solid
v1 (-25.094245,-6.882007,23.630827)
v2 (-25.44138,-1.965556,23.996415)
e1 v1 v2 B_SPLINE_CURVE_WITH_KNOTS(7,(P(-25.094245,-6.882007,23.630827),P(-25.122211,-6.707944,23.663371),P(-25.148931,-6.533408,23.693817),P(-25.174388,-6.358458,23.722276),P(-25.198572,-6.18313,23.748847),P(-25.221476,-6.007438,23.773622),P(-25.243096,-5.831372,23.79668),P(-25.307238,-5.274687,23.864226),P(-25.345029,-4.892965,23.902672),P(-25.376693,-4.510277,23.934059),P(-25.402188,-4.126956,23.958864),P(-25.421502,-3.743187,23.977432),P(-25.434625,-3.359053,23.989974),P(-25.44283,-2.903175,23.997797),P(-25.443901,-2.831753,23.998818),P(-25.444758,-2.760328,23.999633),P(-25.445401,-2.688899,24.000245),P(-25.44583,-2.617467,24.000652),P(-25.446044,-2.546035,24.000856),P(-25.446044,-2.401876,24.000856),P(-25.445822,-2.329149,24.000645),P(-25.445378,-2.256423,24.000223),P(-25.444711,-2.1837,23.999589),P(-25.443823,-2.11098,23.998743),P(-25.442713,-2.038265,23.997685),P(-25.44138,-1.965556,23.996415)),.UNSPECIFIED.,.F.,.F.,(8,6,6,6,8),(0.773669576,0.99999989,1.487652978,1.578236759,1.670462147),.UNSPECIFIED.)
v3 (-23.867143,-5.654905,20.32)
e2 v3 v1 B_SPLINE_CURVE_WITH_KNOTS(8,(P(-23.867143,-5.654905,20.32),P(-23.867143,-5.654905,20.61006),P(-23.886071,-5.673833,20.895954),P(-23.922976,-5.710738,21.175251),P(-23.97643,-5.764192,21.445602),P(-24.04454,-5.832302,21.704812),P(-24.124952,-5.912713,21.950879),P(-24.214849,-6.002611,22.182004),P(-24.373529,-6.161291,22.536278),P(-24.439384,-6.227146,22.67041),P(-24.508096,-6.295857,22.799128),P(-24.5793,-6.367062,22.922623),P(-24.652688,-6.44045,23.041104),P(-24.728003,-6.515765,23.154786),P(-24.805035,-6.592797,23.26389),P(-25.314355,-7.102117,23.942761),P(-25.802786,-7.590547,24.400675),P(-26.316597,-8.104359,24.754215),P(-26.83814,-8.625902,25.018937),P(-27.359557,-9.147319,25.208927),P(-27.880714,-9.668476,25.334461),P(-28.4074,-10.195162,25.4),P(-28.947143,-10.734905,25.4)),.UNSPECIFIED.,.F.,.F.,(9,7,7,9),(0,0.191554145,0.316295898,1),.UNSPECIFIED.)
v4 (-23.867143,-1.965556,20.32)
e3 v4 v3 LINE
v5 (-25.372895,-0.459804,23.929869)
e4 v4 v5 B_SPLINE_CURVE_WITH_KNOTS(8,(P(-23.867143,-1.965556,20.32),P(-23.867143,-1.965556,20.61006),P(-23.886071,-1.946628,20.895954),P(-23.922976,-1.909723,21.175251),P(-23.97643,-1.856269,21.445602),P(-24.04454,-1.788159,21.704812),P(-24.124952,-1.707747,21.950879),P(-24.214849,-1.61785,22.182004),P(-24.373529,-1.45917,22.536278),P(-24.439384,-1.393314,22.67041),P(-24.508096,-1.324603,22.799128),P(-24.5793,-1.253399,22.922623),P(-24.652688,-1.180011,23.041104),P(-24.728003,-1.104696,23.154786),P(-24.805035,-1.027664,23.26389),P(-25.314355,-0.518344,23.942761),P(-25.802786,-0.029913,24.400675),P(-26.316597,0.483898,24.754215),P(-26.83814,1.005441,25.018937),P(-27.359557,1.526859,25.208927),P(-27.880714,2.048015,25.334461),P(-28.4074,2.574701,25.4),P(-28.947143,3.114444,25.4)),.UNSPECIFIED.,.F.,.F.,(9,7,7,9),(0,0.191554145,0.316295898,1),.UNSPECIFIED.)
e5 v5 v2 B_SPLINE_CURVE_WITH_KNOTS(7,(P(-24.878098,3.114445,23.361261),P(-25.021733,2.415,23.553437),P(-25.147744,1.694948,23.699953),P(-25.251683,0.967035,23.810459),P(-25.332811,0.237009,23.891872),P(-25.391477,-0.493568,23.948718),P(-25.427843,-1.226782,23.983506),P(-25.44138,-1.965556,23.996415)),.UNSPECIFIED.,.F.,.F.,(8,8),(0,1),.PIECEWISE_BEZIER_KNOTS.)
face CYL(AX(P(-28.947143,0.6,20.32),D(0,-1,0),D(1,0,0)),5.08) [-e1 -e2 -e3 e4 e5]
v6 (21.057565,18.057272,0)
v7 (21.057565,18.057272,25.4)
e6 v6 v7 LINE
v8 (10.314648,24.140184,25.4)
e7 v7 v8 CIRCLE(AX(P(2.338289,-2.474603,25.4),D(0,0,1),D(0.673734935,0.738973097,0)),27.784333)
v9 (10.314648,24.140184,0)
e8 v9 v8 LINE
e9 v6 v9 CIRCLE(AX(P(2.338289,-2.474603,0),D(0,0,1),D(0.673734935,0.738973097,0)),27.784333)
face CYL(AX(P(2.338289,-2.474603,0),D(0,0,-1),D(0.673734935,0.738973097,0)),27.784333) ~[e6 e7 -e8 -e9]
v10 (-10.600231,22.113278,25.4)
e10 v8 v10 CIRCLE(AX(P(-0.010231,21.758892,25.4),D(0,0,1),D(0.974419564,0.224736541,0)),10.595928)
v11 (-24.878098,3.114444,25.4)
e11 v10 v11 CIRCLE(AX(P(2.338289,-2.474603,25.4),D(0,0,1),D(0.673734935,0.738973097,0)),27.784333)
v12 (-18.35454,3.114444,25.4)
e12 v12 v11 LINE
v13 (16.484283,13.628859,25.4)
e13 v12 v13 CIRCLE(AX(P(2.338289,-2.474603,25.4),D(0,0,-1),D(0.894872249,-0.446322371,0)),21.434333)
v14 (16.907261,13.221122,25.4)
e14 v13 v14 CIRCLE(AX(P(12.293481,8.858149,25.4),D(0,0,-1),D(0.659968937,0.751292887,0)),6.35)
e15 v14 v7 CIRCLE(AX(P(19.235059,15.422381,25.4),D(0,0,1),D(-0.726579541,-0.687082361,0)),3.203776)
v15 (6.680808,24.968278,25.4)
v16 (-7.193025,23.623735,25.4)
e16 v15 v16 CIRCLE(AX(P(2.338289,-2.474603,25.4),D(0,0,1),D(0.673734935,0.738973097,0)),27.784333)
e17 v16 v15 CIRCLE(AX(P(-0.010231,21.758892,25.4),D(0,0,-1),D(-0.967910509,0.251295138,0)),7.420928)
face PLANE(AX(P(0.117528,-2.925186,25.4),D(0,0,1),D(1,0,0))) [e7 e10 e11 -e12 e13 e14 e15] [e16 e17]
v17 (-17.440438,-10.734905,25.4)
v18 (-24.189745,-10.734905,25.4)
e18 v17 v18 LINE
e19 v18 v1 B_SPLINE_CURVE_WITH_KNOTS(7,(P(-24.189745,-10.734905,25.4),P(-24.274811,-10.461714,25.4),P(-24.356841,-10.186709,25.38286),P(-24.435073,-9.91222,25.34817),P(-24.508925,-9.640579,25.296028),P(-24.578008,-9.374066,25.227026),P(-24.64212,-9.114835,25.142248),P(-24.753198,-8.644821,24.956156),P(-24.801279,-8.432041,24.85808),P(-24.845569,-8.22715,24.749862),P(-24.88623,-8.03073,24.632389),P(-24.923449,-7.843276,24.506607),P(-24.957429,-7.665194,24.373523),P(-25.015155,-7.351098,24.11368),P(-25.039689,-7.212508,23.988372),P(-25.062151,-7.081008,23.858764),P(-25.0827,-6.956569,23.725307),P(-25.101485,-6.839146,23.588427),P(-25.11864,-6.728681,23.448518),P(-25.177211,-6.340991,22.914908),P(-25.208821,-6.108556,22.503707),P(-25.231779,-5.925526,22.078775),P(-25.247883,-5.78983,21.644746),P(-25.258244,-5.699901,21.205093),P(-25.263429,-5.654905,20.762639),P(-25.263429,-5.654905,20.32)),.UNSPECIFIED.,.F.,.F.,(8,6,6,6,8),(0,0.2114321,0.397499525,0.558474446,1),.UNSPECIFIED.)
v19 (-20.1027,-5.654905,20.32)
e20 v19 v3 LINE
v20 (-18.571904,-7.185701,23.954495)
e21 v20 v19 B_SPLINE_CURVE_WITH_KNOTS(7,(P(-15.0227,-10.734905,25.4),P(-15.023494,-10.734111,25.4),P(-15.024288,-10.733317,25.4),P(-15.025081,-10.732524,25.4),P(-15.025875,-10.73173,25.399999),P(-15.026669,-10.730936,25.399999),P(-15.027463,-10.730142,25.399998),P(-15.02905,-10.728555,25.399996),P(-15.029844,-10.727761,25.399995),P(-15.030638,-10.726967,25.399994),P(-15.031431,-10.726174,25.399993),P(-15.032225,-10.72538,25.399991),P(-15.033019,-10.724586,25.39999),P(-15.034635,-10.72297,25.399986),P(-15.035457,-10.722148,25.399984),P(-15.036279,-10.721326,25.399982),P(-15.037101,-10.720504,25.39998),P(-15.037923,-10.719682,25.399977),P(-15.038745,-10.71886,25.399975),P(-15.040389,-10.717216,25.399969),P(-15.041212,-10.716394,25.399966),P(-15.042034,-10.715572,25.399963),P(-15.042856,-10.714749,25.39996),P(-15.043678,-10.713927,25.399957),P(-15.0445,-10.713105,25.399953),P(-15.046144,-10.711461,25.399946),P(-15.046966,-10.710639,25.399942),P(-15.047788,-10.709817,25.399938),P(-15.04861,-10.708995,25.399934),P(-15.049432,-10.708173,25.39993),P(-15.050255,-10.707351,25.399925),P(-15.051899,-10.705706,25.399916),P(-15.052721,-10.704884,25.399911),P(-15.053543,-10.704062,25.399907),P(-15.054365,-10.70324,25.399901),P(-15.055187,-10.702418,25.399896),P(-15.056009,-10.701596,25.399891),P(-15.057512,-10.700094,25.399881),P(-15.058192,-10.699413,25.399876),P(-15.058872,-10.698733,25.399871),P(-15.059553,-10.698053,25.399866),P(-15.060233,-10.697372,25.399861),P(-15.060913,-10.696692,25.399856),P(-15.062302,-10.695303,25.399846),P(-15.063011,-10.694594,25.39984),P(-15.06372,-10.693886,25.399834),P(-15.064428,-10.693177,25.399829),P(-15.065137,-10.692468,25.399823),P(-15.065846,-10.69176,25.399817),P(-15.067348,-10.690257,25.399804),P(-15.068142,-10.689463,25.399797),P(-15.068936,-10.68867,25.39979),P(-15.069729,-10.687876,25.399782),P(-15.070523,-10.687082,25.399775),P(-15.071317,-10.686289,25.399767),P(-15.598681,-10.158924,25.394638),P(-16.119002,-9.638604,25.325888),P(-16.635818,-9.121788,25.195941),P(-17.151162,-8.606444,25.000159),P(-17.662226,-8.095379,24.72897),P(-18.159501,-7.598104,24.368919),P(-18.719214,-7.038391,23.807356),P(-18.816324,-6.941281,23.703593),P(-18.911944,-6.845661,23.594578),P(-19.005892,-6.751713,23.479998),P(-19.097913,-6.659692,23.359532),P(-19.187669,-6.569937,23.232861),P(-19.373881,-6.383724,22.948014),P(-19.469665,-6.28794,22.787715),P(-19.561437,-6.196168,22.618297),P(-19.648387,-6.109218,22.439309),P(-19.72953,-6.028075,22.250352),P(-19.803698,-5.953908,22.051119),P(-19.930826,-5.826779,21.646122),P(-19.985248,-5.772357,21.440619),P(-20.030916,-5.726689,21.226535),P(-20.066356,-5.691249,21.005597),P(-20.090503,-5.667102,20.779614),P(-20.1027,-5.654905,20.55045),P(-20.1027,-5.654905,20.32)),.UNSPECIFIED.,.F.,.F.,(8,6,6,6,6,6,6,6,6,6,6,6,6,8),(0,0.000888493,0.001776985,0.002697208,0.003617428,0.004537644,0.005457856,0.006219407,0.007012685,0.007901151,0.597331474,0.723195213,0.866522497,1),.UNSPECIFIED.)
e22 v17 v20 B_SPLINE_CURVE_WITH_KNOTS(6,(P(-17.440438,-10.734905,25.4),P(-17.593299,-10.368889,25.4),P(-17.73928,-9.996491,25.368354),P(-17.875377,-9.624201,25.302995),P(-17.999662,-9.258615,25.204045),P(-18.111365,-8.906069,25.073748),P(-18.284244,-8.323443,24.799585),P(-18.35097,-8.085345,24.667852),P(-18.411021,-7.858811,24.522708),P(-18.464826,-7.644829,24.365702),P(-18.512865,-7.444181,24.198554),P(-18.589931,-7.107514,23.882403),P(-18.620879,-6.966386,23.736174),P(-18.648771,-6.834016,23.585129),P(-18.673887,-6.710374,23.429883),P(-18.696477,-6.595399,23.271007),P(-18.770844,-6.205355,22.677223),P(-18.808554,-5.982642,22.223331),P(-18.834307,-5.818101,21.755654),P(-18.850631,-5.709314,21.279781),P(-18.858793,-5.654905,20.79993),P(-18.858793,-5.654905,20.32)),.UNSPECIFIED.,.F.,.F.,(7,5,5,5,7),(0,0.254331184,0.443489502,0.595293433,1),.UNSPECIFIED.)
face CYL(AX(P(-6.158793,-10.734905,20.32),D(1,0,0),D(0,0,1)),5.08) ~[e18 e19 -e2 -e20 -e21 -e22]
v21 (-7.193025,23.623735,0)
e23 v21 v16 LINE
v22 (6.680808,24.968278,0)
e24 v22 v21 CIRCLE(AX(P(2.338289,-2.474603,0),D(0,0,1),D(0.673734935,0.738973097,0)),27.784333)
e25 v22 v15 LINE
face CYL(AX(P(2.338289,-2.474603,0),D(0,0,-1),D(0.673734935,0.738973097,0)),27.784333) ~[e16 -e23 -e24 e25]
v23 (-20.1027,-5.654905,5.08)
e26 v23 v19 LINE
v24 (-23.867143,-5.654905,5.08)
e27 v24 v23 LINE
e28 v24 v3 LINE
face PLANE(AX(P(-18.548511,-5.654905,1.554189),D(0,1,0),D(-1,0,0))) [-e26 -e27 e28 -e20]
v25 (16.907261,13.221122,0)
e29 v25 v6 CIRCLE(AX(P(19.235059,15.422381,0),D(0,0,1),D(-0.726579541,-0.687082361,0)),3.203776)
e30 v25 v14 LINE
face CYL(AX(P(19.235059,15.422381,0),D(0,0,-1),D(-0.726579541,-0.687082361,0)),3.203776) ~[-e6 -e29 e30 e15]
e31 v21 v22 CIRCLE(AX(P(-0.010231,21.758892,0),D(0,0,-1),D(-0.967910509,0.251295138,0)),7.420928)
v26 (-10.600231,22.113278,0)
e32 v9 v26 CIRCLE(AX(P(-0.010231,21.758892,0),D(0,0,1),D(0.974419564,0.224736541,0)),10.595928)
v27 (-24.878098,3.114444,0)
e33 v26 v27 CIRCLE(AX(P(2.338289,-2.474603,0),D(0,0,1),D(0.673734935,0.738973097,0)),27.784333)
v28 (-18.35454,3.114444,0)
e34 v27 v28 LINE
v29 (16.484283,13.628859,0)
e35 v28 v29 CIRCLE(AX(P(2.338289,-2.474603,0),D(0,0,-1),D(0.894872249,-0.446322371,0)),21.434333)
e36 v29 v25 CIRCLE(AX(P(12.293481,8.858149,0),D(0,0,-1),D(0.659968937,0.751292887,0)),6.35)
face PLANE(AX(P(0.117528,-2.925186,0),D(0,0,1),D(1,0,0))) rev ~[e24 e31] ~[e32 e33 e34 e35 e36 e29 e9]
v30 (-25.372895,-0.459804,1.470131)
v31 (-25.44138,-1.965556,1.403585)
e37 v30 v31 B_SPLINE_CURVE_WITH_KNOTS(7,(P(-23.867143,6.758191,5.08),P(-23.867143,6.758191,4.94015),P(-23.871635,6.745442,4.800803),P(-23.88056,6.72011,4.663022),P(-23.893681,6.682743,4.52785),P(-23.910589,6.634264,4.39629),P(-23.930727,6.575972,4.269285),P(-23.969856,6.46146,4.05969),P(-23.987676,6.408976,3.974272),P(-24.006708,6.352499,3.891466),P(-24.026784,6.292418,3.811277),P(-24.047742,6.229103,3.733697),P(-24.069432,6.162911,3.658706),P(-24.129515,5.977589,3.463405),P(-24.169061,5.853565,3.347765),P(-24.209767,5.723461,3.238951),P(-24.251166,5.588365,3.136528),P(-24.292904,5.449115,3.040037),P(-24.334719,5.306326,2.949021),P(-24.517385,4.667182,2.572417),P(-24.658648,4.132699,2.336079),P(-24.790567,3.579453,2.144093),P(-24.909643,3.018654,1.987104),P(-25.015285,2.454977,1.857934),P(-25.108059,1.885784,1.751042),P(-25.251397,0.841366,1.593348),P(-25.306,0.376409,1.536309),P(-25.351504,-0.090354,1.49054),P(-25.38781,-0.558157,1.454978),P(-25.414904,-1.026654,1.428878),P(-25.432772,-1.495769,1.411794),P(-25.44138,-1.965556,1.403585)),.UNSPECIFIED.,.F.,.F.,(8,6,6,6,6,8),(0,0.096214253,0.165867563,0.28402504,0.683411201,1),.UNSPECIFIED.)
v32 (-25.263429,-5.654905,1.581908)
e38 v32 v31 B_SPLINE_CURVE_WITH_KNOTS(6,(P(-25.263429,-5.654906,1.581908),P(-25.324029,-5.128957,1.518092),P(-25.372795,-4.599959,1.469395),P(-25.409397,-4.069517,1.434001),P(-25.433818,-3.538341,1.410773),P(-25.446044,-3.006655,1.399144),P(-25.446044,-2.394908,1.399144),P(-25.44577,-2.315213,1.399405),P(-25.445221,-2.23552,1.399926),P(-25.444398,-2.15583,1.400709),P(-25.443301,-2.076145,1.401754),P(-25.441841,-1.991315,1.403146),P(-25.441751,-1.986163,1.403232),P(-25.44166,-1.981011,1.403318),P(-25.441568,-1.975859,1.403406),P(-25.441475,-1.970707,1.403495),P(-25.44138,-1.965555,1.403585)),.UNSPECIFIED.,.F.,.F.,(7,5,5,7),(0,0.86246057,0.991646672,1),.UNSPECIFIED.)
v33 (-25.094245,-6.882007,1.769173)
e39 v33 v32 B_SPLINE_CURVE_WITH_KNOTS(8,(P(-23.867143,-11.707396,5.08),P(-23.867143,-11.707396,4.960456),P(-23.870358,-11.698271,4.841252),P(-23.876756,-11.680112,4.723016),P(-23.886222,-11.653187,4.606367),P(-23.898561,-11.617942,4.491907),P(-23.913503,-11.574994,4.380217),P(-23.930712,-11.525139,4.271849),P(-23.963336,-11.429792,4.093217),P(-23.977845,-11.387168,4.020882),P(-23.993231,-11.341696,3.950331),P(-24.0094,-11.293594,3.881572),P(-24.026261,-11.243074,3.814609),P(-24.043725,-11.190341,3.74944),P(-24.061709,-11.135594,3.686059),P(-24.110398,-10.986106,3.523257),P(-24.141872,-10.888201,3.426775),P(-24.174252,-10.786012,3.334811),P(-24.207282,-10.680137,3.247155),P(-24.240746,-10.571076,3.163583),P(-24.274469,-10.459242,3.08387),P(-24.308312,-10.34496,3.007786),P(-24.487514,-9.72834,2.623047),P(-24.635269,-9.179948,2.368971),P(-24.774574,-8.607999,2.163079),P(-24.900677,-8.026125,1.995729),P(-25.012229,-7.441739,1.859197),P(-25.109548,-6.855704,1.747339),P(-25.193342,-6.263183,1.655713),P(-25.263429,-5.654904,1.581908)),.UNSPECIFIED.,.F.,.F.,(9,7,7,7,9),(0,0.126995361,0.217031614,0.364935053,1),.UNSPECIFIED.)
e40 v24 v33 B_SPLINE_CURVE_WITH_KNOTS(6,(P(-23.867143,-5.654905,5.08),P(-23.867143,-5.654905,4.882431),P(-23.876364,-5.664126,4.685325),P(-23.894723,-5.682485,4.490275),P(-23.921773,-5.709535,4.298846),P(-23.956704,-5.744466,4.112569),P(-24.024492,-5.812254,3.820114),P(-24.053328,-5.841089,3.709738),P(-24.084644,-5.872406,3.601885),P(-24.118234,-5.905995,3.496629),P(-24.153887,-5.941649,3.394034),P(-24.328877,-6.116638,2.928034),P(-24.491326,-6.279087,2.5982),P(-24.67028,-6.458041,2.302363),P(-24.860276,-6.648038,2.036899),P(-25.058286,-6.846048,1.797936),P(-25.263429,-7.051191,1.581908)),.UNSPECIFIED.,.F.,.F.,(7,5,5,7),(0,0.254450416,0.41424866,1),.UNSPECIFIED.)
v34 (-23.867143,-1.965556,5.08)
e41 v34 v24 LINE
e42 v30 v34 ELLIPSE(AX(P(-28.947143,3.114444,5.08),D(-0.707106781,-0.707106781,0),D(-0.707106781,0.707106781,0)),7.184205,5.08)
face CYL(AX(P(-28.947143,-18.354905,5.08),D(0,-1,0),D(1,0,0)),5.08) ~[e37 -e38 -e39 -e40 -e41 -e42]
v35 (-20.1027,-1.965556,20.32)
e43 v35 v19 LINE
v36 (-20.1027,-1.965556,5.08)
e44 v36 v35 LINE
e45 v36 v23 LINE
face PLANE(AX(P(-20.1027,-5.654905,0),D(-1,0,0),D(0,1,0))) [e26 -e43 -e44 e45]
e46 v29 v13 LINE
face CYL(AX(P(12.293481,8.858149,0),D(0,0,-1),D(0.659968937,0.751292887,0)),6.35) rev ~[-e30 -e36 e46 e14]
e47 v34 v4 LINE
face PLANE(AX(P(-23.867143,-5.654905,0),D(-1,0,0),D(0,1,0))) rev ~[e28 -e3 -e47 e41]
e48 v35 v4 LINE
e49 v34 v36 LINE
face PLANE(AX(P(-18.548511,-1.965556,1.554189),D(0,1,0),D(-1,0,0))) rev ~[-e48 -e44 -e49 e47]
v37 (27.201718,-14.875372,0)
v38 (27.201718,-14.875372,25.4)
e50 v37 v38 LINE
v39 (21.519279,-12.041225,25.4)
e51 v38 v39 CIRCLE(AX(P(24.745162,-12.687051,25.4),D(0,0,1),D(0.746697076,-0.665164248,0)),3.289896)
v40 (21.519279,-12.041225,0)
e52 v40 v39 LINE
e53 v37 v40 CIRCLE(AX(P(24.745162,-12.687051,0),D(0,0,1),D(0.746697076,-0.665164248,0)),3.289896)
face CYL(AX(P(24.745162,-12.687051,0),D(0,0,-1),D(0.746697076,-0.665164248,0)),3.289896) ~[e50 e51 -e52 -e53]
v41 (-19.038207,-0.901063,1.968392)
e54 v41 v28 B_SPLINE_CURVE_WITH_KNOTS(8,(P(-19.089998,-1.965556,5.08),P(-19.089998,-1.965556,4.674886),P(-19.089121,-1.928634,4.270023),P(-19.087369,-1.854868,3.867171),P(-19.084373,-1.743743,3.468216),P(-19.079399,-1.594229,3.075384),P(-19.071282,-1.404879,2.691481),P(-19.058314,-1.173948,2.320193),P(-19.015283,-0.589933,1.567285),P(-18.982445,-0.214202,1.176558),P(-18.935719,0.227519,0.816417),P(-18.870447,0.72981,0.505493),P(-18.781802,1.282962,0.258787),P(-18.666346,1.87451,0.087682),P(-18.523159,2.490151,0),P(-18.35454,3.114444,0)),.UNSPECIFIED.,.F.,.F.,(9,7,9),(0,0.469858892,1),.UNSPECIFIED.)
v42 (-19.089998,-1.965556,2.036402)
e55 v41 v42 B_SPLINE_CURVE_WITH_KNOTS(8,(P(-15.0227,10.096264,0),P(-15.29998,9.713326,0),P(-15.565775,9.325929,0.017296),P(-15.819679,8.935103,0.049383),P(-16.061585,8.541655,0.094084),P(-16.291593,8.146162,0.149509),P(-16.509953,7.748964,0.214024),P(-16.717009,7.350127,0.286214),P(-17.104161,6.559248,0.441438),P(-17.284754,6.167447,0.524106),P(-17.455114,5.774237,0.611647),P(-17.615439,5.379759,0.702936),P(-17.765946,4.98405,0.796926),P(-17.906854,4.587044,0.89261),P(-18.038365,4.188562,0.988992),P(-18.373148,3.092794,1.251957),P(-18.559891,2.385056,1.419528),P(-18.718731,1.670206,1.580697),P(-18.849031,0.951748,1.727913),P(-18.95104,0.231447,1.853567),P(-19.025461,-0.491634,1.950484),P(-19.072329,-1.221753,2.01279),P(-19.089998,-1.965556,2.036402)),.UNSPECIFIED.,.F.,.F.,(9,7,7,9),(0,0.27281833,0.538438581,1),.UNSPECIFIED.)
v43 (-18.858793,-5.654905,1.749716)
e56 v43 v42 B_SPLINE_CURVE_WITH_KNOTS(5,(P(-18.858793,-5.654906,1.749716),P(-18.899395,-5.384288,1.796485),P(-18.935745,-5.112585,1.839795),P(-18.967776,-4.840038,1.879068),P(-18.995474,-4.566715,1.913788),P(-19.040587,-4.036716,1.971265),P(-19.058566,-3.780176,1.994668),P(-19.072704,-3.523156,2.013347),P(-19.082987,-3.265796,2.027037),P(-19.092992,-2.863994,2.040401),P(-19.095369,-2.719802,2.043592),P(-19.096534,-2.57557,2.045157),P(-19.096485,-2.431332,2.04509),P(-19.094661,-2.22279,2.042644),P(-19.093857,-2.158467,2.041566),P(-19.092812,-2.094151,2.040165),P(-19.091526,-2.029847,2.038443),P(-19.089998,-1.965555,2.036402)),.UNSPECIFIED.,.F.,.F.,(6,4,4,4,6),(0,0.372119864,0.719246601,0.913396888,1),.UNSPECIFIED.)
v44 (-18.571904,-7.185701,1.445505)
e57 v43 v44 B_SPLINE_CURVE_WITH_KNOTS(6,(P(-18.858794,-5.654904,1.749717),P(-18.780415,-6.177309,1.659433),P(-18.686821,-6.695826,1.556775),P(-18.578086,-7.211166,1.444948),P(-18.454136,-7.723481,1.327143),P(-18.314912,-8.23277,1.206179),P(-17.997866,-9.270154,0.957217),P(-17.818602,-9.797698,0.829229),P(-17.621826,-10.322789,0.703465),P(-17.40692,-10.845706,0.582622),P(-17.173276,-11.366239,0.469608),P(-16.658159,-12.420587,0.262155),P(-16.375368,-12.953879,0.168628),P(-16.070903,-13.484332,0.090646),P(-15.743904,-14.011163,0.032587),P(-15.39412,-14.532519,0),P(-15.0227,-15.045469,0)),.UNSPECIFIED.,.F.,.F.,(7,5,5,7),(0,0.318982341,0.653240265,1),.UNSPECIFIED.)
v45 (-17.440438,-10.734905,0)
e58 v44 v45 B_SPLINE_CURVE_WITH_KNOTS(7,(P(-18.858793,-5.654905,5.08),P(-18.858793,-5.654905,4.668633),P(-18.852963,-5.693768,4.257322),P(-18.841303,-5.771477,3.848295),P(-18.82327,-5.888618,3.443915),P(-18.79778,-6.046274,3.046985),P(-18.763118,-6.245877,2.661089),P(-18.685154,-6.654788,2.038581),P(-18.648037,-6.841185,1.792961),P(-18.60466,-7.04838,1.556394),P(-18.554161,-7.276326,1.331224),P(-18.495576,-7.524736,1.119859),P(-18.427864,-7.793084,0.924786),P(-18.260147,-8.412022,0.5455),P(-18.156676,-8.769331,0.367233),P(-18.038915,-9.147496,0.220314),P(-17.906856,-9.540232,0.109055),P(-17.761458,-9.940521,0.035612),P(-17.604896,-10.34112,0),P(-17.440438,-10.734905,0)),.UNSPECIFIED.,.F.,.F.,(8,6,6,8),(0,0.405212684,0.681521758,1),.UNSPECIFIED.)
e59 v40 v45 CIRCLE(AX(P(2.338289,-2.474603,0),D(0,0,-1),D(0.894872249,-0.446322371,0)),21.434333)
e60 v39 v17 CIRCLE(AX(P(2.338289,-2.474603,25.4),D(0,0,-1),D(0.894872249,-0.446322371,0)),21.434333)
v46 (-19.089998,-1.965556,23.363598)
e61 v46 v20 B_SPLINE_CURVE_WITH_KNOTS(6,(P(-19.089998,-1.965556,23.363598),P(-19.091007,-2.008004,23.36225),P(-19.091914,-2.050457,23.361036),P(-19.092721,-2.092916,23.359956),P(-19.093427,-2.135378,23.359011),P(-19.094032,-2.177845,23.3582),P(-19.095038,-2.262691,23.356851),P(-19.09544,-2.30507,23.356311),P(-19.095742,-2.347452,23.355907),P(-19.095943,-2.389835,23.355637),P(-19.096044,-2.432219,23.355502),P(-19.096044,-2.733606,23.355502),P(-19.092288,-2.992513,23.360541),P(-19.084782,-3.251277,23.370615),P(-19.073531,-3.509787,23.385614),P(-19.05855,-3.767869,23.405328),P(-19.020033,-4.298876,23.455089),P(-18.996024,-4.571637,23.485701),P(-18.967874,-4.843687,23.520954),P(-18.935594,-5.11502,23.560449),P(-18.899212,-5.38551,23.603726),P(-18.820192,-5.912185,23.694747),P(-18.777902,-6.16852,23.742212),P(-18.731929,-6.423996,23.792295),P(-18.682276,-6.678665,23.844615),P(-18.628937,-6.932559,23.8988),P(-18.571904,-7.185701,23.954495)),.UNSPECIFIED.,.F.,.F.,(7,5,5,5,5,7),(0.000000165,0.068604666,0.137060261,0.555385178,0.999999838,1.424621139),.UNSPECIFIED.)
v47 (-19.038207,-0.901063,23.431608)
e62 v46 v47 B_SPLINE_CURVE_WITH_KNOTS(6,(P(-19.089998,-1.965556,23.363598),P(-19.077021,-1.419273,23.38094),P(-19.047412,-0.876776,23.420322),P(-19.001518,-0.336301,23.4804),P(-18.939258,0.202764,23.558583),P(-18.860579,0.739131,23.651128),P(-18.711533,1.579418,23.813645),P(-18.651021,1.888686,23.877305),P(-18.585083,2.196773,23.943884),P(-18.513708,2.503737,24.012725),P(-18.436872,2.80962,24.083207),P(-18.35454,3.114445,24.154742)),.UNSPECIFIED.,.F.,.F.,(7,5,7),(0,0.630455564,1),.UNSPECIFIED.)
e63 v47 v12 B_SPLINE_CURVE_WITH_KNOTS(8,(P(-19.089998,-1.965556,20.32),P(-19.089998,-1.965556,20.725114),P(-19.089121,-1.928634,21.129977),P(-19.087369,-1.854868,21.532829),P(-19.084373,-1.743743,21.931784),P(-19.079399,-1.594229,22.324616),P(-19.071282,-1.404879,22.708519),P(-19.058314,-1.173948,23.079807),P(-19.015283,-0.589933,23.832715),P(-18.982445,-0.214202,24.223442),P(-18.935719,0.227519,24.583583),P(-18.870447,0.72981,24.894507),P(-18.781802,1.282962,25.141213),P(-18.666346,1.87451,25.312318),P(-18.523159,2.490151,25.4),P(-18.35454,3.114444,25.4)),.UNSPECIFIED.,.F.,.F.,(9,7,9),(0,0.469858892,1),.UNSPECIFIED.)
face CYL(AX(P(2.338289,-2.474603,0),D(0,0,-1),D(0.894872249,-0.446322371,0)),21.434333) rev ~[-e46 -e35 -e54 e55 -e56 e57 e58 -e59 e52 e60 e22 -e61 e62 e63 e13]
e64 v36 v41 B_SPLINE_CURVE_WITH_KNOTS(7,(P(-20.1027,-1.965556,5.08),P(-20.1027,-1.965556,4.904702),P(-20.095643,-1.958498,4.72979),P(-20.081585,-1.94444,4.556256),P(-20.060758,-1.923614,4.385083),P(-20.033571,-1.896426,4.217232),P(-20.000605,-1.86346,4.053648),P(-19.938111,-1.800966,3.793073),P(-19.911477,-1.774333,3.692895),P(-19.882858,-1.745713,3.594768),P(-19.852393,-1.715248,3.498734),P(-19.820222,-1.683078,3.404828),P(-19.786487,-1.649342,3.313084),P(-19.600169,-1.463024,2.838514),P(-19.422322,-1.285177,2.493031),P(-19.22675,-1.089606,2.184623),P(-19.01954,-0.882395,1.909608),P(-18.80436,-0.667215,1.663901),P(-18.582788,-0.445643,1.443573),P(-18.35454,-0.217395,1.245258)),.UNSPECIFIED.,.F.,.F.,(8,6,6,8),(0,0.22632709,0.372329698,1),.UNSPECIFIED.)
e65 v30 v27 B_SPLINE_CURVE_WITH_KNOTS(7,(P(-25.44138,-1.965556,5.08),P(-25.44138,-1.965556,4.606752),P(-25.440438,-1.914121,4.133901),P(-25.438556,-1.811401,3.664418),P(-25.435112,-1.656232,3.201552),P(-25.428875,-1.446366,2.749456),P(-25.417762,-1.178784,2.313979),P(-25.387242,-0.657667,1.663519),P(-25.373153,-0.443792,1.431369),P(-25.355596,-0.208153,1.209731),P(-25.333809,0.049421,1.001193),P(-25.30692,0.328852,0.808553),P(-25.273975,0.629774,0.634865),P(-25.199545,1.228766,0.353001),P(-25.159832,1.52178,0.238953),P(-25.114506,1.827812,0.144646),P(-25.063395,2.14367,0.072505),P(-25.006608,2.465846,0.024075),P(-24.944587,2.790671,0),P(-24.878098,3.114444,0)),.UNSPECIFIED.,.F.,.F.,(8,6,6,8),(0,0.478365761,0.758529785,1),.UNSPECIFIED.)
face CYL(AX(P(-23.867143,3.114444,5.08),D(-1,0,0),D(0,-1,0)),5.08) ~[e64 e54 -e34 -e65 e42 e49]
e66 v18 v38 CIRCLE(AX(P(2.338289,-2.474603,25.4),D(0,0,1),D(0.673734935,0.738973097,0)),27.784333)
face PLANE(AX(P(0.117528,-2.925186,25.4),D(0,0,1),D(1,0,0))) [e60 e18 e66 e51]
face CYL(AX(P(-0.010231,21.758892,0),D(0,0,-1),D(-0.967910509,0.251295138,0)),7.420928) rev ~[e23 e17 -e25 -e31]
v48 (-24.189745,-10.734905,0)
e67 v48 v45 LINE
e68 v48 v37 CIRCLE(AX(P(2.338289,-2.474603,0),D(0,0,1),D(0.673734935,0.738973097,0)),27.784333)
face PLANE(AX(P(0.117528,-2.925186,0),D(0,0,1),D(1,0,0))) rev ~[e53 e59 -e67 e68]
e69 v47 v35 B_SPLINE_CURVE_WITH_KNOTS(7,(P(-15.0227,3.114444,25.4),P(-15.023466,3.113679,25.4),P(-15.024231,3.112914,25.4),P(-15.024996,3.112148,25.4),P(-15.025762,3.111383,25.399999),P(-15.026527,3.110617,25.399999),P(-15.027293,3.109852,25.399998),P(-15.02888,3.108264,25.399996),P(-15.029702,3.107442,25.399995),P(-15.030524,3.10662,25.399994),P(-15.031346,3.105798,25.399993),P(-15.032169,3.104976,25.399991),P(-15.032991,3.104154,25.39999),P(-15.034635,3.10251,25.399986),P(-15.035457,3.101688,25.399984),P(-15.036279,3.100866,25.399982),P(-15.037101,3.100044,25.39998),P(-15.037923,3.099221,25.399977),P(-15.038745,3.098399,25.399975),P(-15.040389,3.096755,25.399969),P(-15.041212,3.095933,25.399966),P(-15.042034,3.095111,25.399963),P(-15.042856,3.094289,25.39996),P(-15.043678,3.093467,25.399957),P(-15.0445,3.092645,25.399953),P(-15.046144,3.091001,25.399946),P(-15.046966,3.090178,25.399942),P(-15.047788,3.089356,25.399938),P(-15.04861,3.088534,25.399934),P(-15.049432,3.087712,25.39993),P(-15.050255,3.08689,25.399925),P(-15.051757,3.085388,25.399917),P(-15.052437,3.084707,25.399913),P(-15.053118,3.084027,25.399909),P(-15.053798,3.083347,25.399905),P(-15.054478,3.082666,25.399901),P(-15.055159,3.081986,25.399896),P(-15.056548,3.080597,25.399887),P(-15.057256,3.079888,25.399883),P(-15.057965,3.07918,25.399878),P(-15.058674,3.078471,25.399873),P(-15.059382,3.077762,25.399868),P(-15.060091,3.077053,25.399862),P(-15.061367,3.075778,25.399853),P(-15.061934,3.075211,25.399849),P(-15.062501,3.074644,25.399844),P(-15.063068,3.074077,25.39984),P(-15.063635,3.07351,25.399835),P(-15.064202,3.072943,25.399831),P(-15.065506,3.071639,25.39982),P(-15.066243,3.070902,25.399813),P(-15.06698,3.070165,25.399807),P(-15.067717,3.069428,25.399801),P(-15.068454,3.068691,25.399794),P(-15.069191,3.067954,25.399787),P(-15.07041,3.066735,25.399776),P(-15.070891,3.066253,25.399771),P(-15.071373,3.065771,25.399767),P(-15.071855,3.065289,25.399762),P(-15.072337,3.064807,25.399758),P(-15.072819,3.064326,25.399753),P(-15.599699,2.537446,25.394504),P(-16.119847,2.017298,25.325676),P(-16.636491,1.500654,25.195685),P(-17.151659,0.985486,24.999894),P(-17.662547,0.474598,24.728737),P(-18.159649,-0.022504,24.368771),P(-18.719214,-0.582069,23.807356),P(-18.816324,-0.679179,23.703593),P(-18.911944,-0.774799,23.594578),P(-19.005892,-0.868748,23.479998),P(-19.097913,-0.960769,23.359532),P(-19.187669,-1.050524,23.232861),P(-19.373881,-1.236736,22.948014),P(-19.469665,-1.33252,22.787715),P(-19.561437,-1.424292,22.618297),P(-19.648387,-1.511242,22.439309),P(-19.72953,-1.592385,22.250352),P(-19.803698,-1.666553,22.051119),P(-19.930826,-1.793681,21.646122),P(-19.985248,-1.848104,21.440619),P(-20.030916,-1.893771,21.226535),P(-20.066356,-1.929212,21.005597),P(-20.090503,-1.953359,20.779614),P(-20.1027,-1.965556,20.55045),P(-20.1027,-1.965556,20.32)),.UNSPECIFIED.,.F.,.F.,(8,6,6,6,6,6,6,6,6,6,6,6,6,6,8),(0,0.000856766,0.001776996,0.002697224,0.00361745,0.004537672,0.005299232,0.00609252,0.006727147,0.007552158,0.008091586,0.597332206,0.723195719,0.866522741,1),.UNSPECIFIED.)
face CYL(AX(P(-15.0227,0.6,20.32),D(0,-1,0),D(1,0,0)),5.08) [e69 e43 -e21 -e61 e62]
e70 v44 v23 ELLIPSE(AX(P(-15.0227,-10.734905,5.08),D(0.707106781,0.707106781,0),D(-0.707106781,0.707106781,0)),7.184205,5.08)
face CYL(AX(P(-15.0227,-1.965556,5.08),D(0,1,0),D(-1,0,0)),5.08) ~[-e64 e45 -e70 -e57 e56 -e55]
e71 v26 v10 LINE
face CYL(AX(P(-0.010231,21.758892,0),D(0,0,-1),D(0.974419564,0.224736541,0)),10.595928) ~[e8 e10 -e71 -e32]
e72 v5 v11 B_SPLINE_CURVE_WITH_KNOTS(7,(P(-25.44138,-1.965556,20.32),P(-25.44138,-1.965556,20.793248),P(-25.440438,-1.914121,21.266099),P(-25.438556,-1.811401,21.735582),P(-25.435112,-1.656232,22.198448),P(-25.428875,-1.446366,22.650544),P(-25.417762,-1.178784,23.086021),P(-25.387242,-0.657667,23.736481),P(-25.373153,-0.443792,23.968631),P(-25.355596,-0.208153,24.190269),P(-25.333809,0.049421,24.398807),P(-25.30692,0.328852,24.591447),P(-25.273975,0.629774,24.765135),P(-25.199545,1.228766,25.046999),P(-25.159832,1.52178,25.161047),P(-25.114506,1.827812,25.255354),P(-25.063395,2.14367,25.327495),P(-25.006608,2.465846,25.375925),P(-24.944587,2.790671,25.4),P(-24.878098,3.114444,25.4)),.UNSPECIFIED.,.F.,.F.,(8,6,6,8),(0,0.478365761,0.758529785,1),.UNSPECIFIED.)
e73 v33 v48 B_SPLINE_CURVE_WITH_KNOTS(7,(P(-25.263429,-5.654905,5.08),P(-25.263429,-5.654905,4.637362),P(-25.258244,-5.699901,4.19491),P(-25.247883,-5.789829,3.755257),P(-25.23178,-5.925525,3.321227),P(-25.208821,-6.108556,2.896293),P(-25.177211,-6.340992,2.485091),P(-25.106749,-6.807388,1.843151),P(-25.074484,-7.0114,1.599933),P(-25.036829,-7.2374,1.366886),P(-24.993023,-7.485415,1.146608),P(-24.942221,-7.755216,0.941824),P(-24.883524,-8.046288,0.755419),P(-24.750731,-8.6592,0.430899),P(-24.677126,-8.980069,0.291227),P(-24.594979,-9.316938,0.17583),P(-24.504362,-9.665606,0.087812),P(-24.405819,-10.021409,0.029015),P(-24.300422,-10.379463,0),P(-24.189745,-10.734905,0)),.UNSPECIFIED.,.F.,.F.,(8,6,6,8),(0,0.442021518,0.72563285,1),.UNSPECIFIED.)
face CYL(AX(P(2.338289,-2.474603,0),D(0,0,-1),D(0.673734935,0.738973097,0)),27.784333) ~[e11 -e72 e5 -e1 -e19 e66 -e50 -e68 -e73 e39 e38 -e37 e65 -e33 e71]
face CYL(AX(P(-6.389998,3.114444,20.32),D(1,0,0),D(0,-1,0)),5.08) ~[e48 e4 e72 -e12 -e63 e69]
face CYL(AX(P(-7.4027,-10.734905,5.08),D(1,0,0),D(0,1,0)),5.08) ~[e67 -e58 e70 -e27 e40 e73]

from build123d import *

# Parameters (mm, degrees)
F0_W         = 3.7644430995
F0_H         = 3.6893493962
F1_DEPTH     = 25.4
F3_DEPTH     = 25.4
F4_T1_DEPTH  = 3.6893493962
F5_T1_DEPTH  = 3.6893493962
F6_T4_DEPTH  = 31.7513819576
F6_S5_R      = 5.0800000001
F6_T6_DEPTH  = 18
F6_S7_R      = 5.0799999999
F6_T8_DEPTH  = 18
F6_T12_DEPTH = 31.8046354707
F6_S13_R     = 5.0800000001
F6_T14_DEPTH = 18
F6_S15_R     = 5.0799999999
F6_T16_DEPTH = 18
F7_T1_DEPTH  = 3.6893493962
F7_T3_DEPTH  = 3.7644430995
F7_T9_DEPTH  = 16.3893493962
F7_S11_R     = 27.7843331243
F7_T12_DEPTH = 10
F7_T15_DEPTH = 16.4644430995
F7_S17_R     = 27.7843331243
F7_T18_DEPTH = 10
F7_T24_DEPTH = 16.4644430995
F7_S26_R     = 27.7843331243
F7_T27_DEPTH = 10
F7_T30_DEPTH = 16.3893493962
F7_S32_R     = 27.7843331243
F7_T33_DEPTH = 10
F7_T39_DEPTH = 16.3893493962
F7_S41_R     = 21.4343331243
F7_T42_DEPTH = 10
F7_T45_DEPTH = 16.4644430995
F7_S47_R     = 21.4343331243
F7_T48_DEPTH = 10
F7_T54_DEPTH = 16.3893493962
F7_S56_R     = 21.4343331243
F7_T57_DEPTH = 10
F7_T60_DEPTH = 16.4644430995
F7_S62_R     = 21.4343331243
F7_T63_DEPTH = 10


# Not quite as in the source:
# - a fillet or chamfer that OpenCascade refuses, or shapes differently, is made with other operations: its cross-section is extruded or revolved along the edge and cut away or added


with BuildPart() as f1:
    # F0 (on Top) → F1 (new body)
    with BuildSketch(Plane.XY):
        with BuildLine():
            ThreePointArc((21.5192791075, -12.0412250981), (-18.6952618922, -6.6001770911), (16.4842832794, 13.628859286))
            ThreePointArc((16.4842832794, 13.628859286), (16.7004899528, 13.4298852219), (16.9072606144, 13.2211224445))
            ThreePointArc((16.9072606144, 13.2211224445), (21.6662962935, 13.3359323022), (21.0575650897, 18.0572719658))
            ThreePointArc((21.0575650897, 18.0572719658), (-24.9747625183, -7.5703236346), (27.2017178865, -14.8753721518))
            ThreePointArc((27.2017178865, -14.8753721518), (26.2135164235, -9.7430147231), (21.5192791075, -12.0412250981))
        make_face()
        with Locations((-21.9849217683, -3.8102302933)):
            Rectangle(F0_W, F0_H, mode=Mode.SUBTRACT)
    extrude(amount=F1_DEPTH)

    # F2 (on Top) → F3 (join)
    with BuildSketch(Plane.XY):
        with BuildLine():
            ThreePointArc((-7.1930247185, 23.6237348024), (-0.7260554424, 29.1452143248), (6.6808082429, 24.968277878))
            ThreePointArc((6.6808082429, 24.968277878), (8.51162891, 24.6152301343), (10.3146480708, 24.140183894))
            ThreePointArc((10.3146480708, 24.140183894), (-1.0323167037, 32.3054087872), (-10.6002305361, 22.1132778988))
            ThreePointArc((-10.6002305361, 22.1132778988), (-8.9219828274, 22.9257012198), (-7.1930247185, 23.6237348025))
        make_face()
    extrude(amount=F3_DEPTH)

    # F4: fillet of radius 5.08 on 1 edges, made by hand

    # F4_s2 → F4_t1 (cut)
    with BuildSketch(Plane.XZ.offset(1.9655555952)):
        with BuildLine():
            ThreePointArc((-15.0227002186, 25.4), (-18.614802667, 23.9121024484), (-20.1027002186, 20.32))
            Line((-20.1027002186, 20.32), (-20.1027002186, 25.4))
            Line((-20.1027002186, 25.4), (-15.0227002186, 25.4))
        make_face()
    extrude(amount=F4_T1_DEPTH, mode=Mode.SUBTRACT)

    # F5: fillet of radius 5.08 on 1 edges, made by hand

    # F5_s2 → F5_t1 (cut)
    with BuildSketch(Plane.XZ.offset(1.9655555952)):
        with BuildLine():
            ThreePointArc((-28.9471433181, 25.4), (-25.3550408696, 23.9121024484), (-23.8671433181, 20.32))
            Line((-23.8671433181, 20.32), (-23.8671433181, 25.4))
            Line((-23.8671433181, 25.4), (-28.9471433181, 25.4))
        make_face()
    extrude(amount=F5_T1_DEPTH, mode=Mode.SUBTRACT)

    # F6: fillet of radius 5.08 on 2 edges, made by hand


with BuildPart() as f6_tool2:
    # F6_s3 → F6_t4 (new body)
    with BuildSketch(Plane.YZ.offset(-6.3899983285)):
        with BuildLine():
            ThreePointArc((-1.9655555952, 20.32), (-0.4776580437, 23.9121024484), (3.1144444048, 25.4))
            Line((3.1144444048, 25.4), (-1.9655555952, 25.4))
            Line((-1.9655555952, 25.4), (-1.9655555952, 20.32))
        make_face()
    extrude(amount=-F6_T4_DEPTH)

    # F6_s5 → F6_t6 (cut, symmetric)
    with BuildSketch(Plane.XZ.offset(-0.6)):
        with Locations((-15.0227002185, 20.3199999999)):
            Circle(F6_S5_R)
    extrude(amount=F6_T6_DEPTH, both=True, mode=Mode.SUBTRACT)

    # F6_s7 → F6_t8 (cut, symmetric)
    with BuildSketch(Plane.XZ.offset(-0.6)):
        with Locations((-28.947143318, 20.3200000001)):
            Circle(F6_S7_R)
    extrude(amount=F6_T8_DEPTH, both=True, mode=Mode.SUBTRACT)


with BuildPart() as f1_1:
    add(f1.part)

    # F6_t1: cut F6_tool2
    add(f6_tool2.part, mode=Mode.SUBTRACT)


with BuildPart() as f6_tool10:
    # F6_s11 → F6_t12 (new body)
    with BuildSketch(Plane.YZ.offset(-6.1587934503)):
        with BuildLine():
            ThreePointArc((-10.7349049914, 25.4), (-7.142802543, 23.9121024484), (-5.6549049914, 20.32))
            Line((-5.6549049914, 20.32), (-5.6549049914, 25.4))
            Line((-5.6549049914, 25.4), (-10.7349049914, 25.4))
        make_face()
    extrude(amount=-F6_T12_DEPTH)

    # F6_s13 → F6_t14 (cut, symmetric)
    with BuildSketch(Plane.XZ.offset(8.2)):
        with Locations((-15.0227002185, 20.3199999999)):
            Circle(F6_S13_R)
    extrude(amount=F6_T14_DEPTH, both=True, mode=Mode.SUBTRACT)

    # F6_s15 → F6_t16 (cut, symmetric)
    with BuildSketch(Plane.XZ.offset(8.2)):
        with Locations((-28.947143318, 20.3200000001)):
            Circle(F6_S15_R)
    extrude(amount=F6_T16_DEPTH, both=True, mode=Mode.SUBTRACT)


with BuildPart() as f1_2:
    add(f1_1.part)

    # F6_t9: cut F6_tool10
    add(f6_tool10.part, mode=Mode.SUBTRACT)

    # F7: fillet of radius 5.08 on 4 edges, made by hand

    # F7_s2 → F7_t1 (cut)
    with BuildSketch(Plane.XZ.offset(1.9655555952)):
        with BuildLine():
            ThreePointArc((-23.8671433181, 5.08), (-25.3550408696, 1.4878975516), (-28.9471433181, 0))
            Line((-28.9471433181, 0), (-23.8671433181, 0))
            Line((-23.8671433181, 0), (-23.8671433181, 5.08))
        make_face()
        with BuildLine():
            ThreePointArc((-20.1027002186, 5.08), (-18.614802667, 1.4878975516), (-15.0227002186, 0))
            Line((-15.0227002186, 0), (-20.1027002186, 0))
            Line((-20.1027002186, 0), (-20.1027002186, 5.08))
        make_face()
    extrude(amount=F7_T1_DEPTH, mode=Mode.SUBTRACT)

    # F7_s4 → F7_t3 (cut)
    with BuildSketch(Plane.YZ.offset(-23.8671433181)):
        with BuildLine():
            ThreePointArc((-5.6549049914, 5.08), (-7.142802543, 1.4878975516), (-10.7349049914, 0))
            Line((-10.7349049914, 0), (-5.6549049914, 0))
            Line((-5.6549049914, 0), (-5.6549049914, 5.08))
        make_face()
        with BuildLine():
            ThreePointArc((-1.9655555952, 5.08), (-0.4776580437, 1.4878975516), (3.1144444048, 0))
            Line((3.1144444048, 0), (-1.9655555952, 0))
            Line((-1.9655555952, 0), (-1.9655555952, 5.08))
        make_face()
    extrude(amount=F7_T3_DEPTH, mode=Mode.SUBTRACT)


with BuildPart() as f7_tool7:
    # F7_s8 → F7_t9 (new body)
    with BuildSketch(Plane.XZ.offset(18.3549049914)):
        with BuildLine():
            ThreePointArc((-23.8671433181, 5.08), (-25.3550408696, 1.4878975516), (-28.9471433181, 0))
            Line((-28.9471433181, 0), (-23.8671433181, 0))
            Line((-23.8671433181, 0), (-23.8671433181, 5.08))
        make_face()
    extrude(amount=-F7_T9_DEPTH)

    split(bisect_by=Plane.XZ.offset(5.6549049914), keep=Keep.TOP)

    # F7_s11 → F7_t12 (intersect, symmetric)
    with BuildSketch(Plane.XY.offset(2.5)):
        with Locations((2.3382892257, -2.4746027243)):
            Circle(F7_S11_R)
    extrude(amount=F7_T12_DEPTH, both=True, mode=Mode.INTERSECT)


with BuildPart() as f7_tool13:
    # F7_s14 → F7_t15 (new body)
    with BuildSketch(Plane.YZ.offset(-20.1027002186)):
        with BuildLine():
            ThreePointArc((-5.6549049914, 5.08), (-7.142802543, 1.4878975516), (-10.7349049914, 0))
            Line((-10.7349049914, 0), (-5.6549049914, 0))
            Line((-5.6549049914, 0), (-5.6549049914, 5.08))
        make_face()
    extrude(amount=-F7_T15_DEPTH)

    split(bisect_by=Plane.YZ.offset(-23.8671433181), keep=Keep.BOTTOM)

    # F7_s17 → F7_t18 (intersect, symmetric)
    with BuildSketch(Plane.XY.offset(2.5)):
        with Locations((2.3382892257, -2.4746027243)):
            Circle(F7_S17_R)
    extrude(amount=F7_T18_DEPTH, both=True, mode=Mode.INTERSECT)


with BuildPart() as f7_tool7_1:
    add(f7_tool7.part)

    # F7_t19: intersect F7_tool13
    add(f7_tool13.part, mode=Mode.INTERSECT)


with BuildPart() as f1_3:
    add(f1_2.part)

    # F7_t5: cut F7_tool7
    add(f7_tool7_1.part, mode=Mode.SUBTRACT)


with BuildPart() as f7_tool22:
    # F7_s23 → F7_t24 (new body)
    with BuildSketch(Plane.YZ.offset(-36.5671433181)):
        with BuildLine():
            ThreePointArc((-1.9655555952, 5.08), (-0.4776580437, 1.4878975516), (3.1144444048, 0))
            Line((3.1144444048, 0), (-1.9655555952, 0))
            Line((-1.9655555952, 0), (-1.9655555952, 5.08))
        make_face()
    extrude(amount=F7_T24_DEPTH)

    split(bisect_by=Plane.YZ.offset(-23.8671433181), keep=Keep.BOTTOM)

    # F7_s26 → F7_t27 (intersect, symmetric)
    with BuildSketch(Plane.XY.offset(2.5)):
        with Locations((2.3382892257, -2.4746027243)):
            Circle(F7_S26_R)
    extrude(amount=F7_T27_DEPTH, both=True, mode=Mode.INTERSECT)


with BuildPart() as f7_tool28:
    # F7_s29 → F7_t30 (new body)
    with BuildSketch(Plane.XZ.offset(5.6549049914)):
        with BuildLine():
            ThreePointArc((-23.8671433181, 5.08), (-25.3550408696, 1.4878975516), (-28.9471433181, 0))
            Line((-28.9471433181, 0), (-23.8671433181, 0))
            Line((-23.8671433181, 0), (-23.8671433181, 5.08))
        make_face()
    extrude(amount=-F7_T30_DEPTH)

    split(bisect_by=Plane.XZ.offset(1.9655555952), keep=Keep.BOTTOM)

    # F7_s32 → F7_t33 (intersect, symmetric)
    with BuildSketch(Plane.XY.offset(2.5)):
        with Locations((2.3382892257, -2.4746027243)):
            Circle(F7_S32_R)
    extrude(amount=F7_T33_DEPTH, both=True, mode=Mode.INTERSECT)


with BuildPart() as f7_tool22_1:
    add(f7_tool22.part)

    # F7_t34: intersect F7_tool28
    add(f7_tool28.part, mode=Mode.INTERSECT)


with BuildPart() as f1_4:
    add(f1_3.part)

    # F7_t20: cut F7_tool22
    add(f7_tool22_1.part, mode=Mode.SUBTRACT)


with BuildPart() as f7_tool37:
    # F7_s38 → F7_t39 (new body)
    with BuildSketch(Plane.XZ.offset(-10.7344444048)):
        with BuildLine():
            ThreePointArc((-20.1027002186, 5.08), (-18.614802667, 1.4878975516), (-15.0227002186, 0))
            Line((-15.0227002186, 0), (-20.1027002186, 0))
            Line((-20.1027002186, 0), (-20.1027002186, 5.08))
        make_face()
    extrude(amount=F7_T39_DEPTH)

    split(bisect_by=Plane.XZ.offset(1.9655555952), keep=Keep.BOTTOM)

    # F7_s41 → F7_t42 (cut, symmetric)
    with BuildSketch(Plane.XY.offset(2.5)):
        with Locations((2.3382892257, -2.4746027243)):
            Circle(F7_S41_R)
    extrude(amount=F7_T42_DEPTH, both=True, mode=Mode.SUBTRACT)


with BuildPart() as f7_tool43:
    # F7_s44 → F7_t45 (new body)
    with BuildSketch(Plane.YZ.offset(-23.8671433181)):
        with BuildLine():
            ThreePointArc((-1.9655555952, 5.08), (-0.4776580437, 1.4878975516), (3.1144444048, 0))
            Line((3.1144444048, 0), (-1.9655555952, 0))
            Line((-1.9655555952, 0), (-1.9655555952, 5.08))
        make_face()
    extrude(amount=F7_T45_DEPTH)

    split(bisect_by=Plane.YZ.offset(-20.1027002186), keep=Keep.TOP)

    # F7_s47 → F7_t48 (cut, symmetric)
    with BuildSketch(Plane.XY.offset(2.5)):
        with Locations((2.3382892257, -2.4746027243)):
            Circle(F7_S47_R)
    extrude(amount=F7_T48_DEPTH, both=True, mode=Mode.SUBTRACT)


with BuildPart() as f7_tool37_1:
    add(f7_tool37.part)

    # F7_t49: intersect F7_tool43
    add(f7_tool43.part, mode=Mode.INTERSECT)


with BuildPart() as f1_5:
    add(f1_4.part)

    # F7_t35: cut F7_tool37
    add(f7_tool37_1.part, mode=Mode.SUBTRACT)


with BuildPart() as f7_tool52:
    # F7_s53 → F7_t54 (new body)
    with BuildSketch(Plane.XZ.offset(1.9655555952)):
        with BuildLine():
            ThreePointArc((-20.1027002186, 5.08), (-18.614802667, 1.4878975516), (-15.0227002186, 0))
            Line((-15.0227002186, 0), (-20.1027002186, 0))
            Line((-20.1027002186, 0), (-20.1027002186, 5.08))
        make_face()
    extrude(amount=F7_T54_DEPTH)

    split(bisect_by=Plane.XZ.offset(5.6549049914), keep=Keep.TOP)

    # F7_s56 → F7_t57 (cut, symmetric)
    with BuildSketch(Plane.XY.offset(2.5)):
        with Locations((2.3382892257, -2.4746027243)):
            Circle(F7_S56_R)
    extrude(amount=F7_T57_DEPTH, both=True, mode=Mode.SUBTRACT)


with BuildPart() as f7_tool58:
    # F7_s59 → F7_t60 (new body)
    with BuildSketch(Plane.YZ.offset(-7.4027002186)):
        with BuildLine():
            ThreePointArc((-5.6549049914, 5.08), (-7.142802543, 1.4878975516), (-10.7349049914, 0))
            Line((-10.7349049914, 0), (-5.6549049914, 0))
            Line((-5.6549049914, 0), (-5.6549049914, 5.08))
        make_face()
    extrude(amount=-F7_T60_DEPTH)

    split(bisect_by=Plane.YZ.offset(-20.1027002186), keep=Keep.TOP)

    # F7_s62 → F7_t63 (cut, symmetric)
    with BuildSketch(Plane.XY.offset(2.5)):
        with Locations((2.3382892257, -2.4746027243)):
            Circle(F7_S62_R)
    extrude(amount=F7_T63_DEPTH, both=True, mode=Mode.SUBTRACT)


with BuildPart() as f7_tool52_1:
    add(f7_tool52.part)

    # F7_t64: intersect F7_tool58
    add(f7_tool58.part, mode=Mode.INTERSECT)


with BuildPart() as f1_6:
    add(f1_5.part)

    # F7_t50: cut F7_tool52
    add(f7_tool52_1.part, mode=Mode.SUBTRACT)


solid = f1_6.part
